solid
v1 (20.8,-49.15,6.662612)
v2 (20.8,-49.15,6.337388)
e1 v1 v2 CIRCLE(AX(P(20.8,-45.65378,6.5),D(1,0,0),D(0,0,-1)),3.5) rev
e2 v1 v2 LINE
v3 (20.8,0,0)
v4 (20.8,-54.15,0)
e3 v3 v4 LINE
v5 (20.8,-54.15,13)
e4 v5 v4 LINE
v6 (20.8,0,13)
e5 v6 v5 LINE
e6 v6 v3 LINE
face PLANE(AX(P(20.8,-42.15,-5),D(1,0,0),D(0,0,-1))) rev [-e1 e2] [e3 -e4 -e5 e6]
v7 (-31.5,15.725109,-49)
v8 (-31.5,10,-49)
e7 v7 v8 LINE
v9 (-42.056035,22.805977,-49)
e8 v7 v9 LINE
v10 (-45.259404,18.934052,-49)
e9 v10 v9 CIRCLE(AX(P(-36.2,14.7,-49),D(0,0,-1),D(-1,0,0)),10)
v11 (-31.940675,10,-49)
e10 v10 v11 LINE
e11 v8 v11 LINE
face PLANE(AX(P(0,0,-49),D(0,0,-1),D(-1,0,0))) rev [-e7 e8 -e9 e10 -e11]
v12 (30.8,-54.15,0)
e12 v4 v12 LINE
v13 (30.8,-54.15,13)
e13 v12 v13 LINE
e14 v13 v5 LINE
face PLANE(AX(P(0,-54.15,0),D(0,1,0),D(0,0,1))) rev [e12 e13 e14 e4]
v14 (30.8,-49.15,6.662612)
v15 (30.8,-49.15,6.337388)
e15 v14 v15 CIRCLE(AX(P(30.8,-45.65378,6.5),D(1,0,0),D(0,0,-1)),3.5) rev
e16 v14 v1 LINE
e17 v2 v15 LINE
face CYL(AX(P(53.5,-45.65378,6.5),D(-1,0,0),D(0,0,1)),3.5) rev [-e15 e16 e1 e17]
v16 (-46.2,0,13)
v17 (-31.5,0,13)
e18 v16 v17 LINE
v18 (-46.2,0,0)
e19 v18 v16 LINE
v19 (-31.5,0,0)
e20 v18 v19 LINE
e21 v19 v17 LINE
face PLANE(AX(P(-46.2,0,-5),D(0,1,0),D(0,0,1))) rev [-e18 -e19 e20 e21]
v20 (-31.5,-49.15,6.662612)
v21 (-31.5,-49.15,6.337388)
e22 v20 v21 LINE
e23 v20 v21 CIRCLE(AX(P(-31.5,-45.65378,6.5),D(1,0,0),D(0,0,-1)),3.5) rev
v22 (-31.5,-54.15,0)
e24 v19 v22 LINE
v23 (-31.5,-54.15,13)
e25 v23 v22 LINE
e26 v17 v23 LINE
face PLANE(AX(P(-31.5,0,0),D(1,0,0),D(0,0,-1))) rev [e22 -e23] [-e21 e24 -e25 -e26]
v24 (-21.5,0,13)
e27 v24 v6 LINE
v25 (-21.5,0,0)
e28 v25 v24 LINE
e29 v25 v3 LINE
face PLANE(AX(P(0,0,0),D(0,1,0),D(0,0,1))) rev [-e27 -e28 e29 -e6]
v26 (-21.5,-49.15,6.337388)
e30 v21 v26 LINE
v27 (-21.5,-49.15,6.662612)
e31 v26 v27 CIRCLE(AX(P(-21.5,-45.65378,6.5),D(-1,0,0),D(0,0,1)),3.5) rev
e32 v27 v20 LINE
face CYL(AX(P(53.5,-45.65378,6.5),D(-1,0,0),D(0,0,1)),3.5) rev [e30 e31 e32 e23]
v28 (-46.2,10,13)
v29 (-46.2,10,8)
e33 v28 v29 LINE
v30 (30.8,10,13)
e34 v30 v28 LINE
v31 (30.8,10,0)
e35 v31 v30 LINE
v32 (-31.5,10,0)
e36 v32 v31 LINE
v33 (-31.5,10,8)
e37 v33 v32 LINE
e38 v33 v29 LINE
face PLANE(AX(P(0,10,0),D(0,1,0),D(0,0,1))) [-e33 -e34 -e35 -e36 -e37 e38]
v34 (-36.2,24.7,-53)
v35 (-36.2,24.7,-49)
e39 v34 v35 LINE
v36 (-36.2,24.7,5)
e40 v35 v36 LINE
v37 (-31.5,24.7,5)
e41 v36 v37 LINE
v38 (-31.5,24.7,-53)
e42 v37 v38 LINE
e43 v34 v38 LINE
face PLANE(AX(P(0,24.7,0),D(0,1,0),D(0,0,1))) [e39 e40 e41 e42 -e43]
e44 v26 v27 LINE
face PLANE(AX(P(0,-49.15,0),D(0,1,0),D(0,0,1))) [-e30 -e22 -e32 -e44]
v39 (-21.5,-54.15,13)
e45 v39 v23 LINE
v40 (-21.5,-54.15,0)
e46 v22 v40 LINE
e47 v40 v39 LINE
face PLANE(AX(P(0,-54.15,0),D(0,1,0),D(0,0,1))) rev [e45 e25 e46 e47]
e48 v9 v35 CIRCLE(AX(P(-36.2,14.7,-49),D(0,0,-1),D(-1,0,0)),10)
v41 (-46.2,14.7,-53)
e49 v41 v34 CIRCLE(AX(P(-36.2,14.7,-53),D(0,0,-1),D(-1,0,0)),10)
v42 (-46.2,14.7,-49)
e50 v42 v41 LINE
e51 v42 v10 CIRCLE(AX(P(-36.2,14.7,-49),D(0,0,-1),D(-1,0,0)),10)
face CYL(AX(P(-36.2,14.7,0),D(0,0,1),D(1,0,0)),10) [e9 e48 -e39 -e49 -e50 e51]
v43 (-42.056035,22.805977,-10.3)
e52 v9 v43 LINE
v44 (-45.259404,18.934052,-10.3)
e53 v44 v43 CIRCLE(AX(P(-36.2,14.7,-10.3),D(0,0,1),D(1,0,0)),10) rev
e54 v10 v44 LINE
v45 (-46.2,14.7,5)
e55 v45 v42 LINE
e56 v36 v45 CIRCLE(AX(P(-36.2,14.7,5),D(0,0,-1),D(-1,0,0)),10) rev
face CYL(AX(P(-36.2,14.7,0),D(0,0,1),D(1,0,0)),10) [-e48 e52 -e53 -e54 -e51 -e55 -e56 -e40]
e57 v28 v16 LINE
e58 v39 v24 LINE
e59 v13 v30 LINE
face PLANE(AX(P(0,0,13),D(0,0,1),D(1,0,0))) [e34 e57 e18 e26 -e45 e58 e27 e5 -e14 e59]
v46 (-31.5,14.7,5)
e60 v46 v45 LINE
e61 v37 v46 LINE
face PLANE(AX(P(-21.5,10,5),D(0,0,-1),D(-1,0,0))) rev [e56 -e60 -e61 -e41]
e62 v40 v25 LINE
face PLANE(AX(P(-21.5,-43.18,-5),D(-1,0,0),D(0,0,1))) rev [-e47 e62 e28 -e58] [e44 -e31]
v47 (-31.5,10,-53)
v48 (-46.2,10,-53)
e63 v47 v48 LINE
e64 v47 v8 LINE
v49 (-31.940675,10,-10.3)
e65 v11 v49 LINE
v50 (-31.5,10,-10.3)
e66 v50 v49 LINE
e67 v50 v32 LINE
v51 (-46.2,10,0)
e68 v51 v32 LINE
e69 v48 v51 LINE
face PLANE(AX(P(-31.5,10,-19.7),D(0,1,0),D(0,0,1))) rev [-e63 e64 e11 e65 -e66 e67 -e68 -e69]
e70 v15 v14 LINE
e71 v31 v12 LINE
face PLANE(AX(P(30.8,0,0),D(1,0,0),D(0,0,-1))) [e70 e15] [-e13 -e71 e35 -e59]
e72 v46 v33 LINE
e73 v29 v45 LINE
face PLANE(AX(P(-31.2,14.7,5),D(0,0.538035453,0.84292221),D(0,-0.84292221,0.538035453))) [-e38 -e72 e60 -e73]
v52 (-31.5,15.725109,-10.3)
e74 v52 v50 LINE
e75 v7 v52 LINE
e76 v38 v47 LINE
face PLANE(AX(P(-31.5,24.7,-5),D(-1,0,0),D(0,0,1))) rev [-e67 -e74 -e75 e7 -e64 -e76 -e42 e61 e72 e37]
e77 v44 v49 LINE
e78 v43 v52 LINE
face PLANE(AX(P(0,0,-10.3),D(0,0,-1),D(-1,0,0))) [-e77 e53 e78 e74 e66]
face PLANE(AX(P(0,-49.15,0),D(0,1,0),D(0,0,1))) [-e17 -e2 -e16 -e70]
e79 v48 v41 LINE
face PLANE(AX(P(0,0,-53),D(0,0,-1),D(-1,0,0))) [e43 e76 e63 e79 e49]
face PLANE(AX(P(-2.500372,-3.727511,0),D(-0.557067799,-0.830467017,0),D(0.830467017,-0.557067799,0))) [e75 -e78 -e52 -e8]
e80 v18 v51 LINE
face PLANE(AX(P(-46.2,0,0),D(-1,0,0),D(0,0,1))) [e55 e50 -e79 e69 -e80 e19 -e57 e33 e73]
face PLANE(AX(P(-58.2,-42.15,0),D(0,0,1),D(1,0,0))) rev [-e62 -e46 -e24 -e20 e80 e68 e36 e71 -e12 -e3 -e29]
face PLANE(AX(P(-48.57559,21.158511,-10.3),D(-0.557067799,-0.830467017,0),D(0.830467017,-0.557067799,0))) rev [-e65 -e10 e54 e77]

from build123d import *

# Parameters (mm, degrees)
SKETCH_1_W                = 43
SKETCH_1_H                = 10
EXTRUDE_1_DEPTH           = 10
SKETCH_2_W                = 10
SKETCH_2_H                = 10
EXTRUDE_2_DEPTH           = 10
SKETCH_3_W                = 10
SKETCH_3_H                = 10
EXTRUDE_3_DEPTH           = 43.18
SKETCH_4_W                = 10
SKETCH_4_H                = 10
EXTRUDE_4_DEPTH           = 10
SKETCH_5_W                = 10
SKETCH_5_H                = 10
EXTRUDE_5_DEPTH           = 43.18
SKETCH_7_W                = 10
SKETCH_7_H                = 10
EXTRUDE_6_DEPTH           = 14.7
SKETCH_8_W                = 14.7
SKETCH_8_H                = 10
EXTRUDE_7_DEPTH           = 14.7
SKETCH_9_W                = 14.7
SKETCH_9_H                = 14.7
EXTRUDE_8_DEPTH           = 14.7
SKETCH_10_W               = 14.7
SKETCH_10_H               = 14.7
EXTRUDE_10_DEPTH          = 14.82
SKETCH_11_W               = 14.7
SKETCH_11_H               = 14.48
EXTRUDE_11_DEPTH          = 14.82
FILLET_2_R                = 10
CUT_EXTRUDE_1_DEPTH       = 38.7
SKETCH_16_W               = 38.7
SKETCH_16_H               = 0.791061332
CUT_EXTRUDE_2_DEPTH       = 98.525917704
SKETCH_17_W               = 14.259325205
SKETCH_17_H               = 0.12
CUT_EXTRUDE_3_DEPTH       = 38.7
SKETCH_18_W               = 14.7
SKETCH_18_H               = 14.7
EXTRUDE_13_DEPTH          = 4
SKETCH_21_W               = 16.037638094
SKETCH_21_H               = 38.7
CUT_EXTRUDE_4_DEPTH       = 5
FILLET_3_R                = 10
SKETCH_24_W               = 10
SKETCH_24_H               = 53.18
CUT_EXTRUDE_6_DEPTH       = 13
SKETCH_25_W               = 10
SKETCH_25_H               = 1.03
CUT_EXTRUDE_7_DEPTH       = 80.391135525
SKETCH_26_W               = 0.7
SKETCH_26_H               = 10
CUT_EXTRUDE_8_DEPTH       = 79.835667689
SKETCH_27_W               = 10
SKETCH_27_H               = 10
EXTRUDE_15_DEPTH          = 10
SKETCH_28_W               = 10
SKETCH_28_H               = 10
EXTRUDE_16_DEPTH          = 42.15
SKETCH_30_W               = 5
SKETCH_30_H               = 52.15
CUT_EXTRUDE_9_DEPTH       = 89
EXTRUDE_18_DEPTH          = 3
SKETCH_33_W               = 38.7
SKETCH_33_H               = 2.269862795
CUT_EXTRUDE_10_DEPTH      = 3
EXTRUDE_19_DEPTH          = 15
SKETCH_35_W               = 0.3
SKETCH_35_H               = 4.7
CUT_EXTRUDE_11_DEPTH      = 86.293976927
SKETCH_36_W               = 10
SKETCH_36_H               = 8
EXTRUDE_20_DEPTH          = 2
SKETCH_38_W               = 10
SKETCH_38_H               = 8
EXTRUDE_21_DEPTH          = 5
EXTRUDE_22_DEPTH          = 5
CUT_EXTRUDE_13_DEPTH      = 75
CUT_EXTRUDE_13_DEPTH_BACK = 90.218902145
SKETCH_45_R               = 3.5
SKETCH_46_W               = 10
SKETCH_46_H               = 13
EXTRUDE_23_DEPTH          = 5


with BuildPart() as part:
    # 草圖1 → 填料-伸長1 (new body)
    with BuildSketch(Plane(origin=(0, 0, 0), x_dir=(1, 0, 0), z_dir=(0, 1, 0))):
        Rectangle(SKETCH_1_W, SKETCH_1_H)
    extrude(amount=EXTRUDE_1_DEPTH)

    # 草圖2 → 填料-伸長2 (add)
    with BuildSketch(Plane(origin=(21.5, 0, 0), x_dir=(0, 0, -1), z_dir=(1, 0, 0))):
        with Locations((0, 5)):
            Rectangle(SKETCH_2_W, SKETCH_2_H)
    extrude(amount=EXTRUDE_2_DEPTH)

    # 草圖3 → 填料-伸長3 (add)
    with BuildSketch(Plane.XZ):
        with Locations((26.5, 0)):
            Rectangle(SKETCH_3_W, SKETCH_3_H)
    extrude(amount=EXTRUDE_3_DEPTH)

    # 草圖4 → 填料-伸長4 (add)
    with BuildSketch(Plane.ZY.offset(21.5)):
        with Locations((0, 5)):
            Rectangle(SKETCH_4_W, SKETCH_4_H)
    extrude(amount=EXTRUDE_4_DEPTH)

    # 草圖5 → 填料-伸長5 (add)
    with BuildSketch(Plane.XZ):
        with Locations((-26.5, 0)):
            Rectangle(SKETCH_5_W, SKETCH_5_H)
    extrude(amount=EXTRUDE_5_DEPTH)

    # 草圖7 → 填料-伸長6 (add)
    with BuildSketch(Plane.ZY.offset(31.5)):
        with Locations((0, 5)):
            Rectangle(SKETCH_7_W, SKETCH_7_H)
    extrude(amount=EXTRUDE_6_DEPTH)

    # 草圖8 → 填料-伸長7 (add)
    with BuildSketch(Plane(origin=(0, 10, 0), x_dir=(1, 0, 0), z_dir=(0, 1, 0))):
        with Locations((-38.85, 0)):
            Rectangle(SKETCH_8_W, SKETCH_8_H)
    extrude(amount=EXTRUDE_7_DEPTH)

    # 草圖9 → 填料-伸長8 (add)
    with BuildSketch(Plane(origin=(0, 0, -5), x_dir=(-1, 0, 0), z_dir=(0, 0, -1))):
        with Locations((38.85, 17.35)):
            Rectangle(SKETCH_9_W, SKETCH_9_H)
    extrude(amount=EXTRUDE_8_DEPTH)

    # 草圖10 → 填料-伸長10 (add)
    with BuildSketch(Plane(origin=(0, 0, -19.7), x_dir=(-1, 0, 0), z_dir=(0, 0, -1))):
        with Locations((38.85, 17.35)):
            Rectangle(SKETCH_10_W, SKETCH_10_H)
    extrude(amount=EXTRUDE_10_DEPTH)

    # 草圖11 → 填料-伸長11 (add)
    with BuildSketch(Plane(origin=(0, 24.7, 0), x_dir=(1, 0, 0), z_dir=(0, 1, 0))):
        with Locations((-38.85, 41.76)):
            Rectangle(SKETCH_11_W, SKETCH_11_H)
    extrude(amount=-EXTRUDE_11_DEPTH)

    # 圓角2
    fillet_2_edges = [part.edges().sort_by_distance(p)[0] for p in [
        (-46.2, 24.7, -22),
    ]]
    fillet(fillet_2_edges, radius=FILLET_2_R)

    # 草圖15 → 除料-伸長1 (cut)
    with BuildSketch(Plane(origin=(0, 0, -49), x_dir=(-1, 0, 0), z_dir=(0, 0, -1))):
        Polygon((31.5, 10.656950345), (32.021169426, 9.88), (31.5, 9.88), align=None)
    extrude(amount=-CUT_EXTRUDE_1_DEPTH, mode=Mode.SUBTRACT)

    # 草圖16 → 除料-伸長2 (cut, through all)
    with BuildSketch(Plane(origin=(-26.654964144, 17.879845802, 0), x_dir=(0, 0, -1), z_dir=(0.8304670174189052, -0.5570677992662544, 0))):
        with Locations((29.65, -9.092920575)):
            Rectangle(SKETCH_16_W, SKETCH_16_H)
    extrude(amount=-CUT_EXTRUDE_2_DEPTH, mode=Mode.SUBTRACT)

    # 草圖17 → 除料-伸長3 (cut)
    with BuildSketch(Plane(origin=(0, 0, -49), x_dir=(-1, 0, 0), z_dir=(0, 0, -1))):
        with Locations((39.070337398, 9.94)):
            Rectangle(SKETCH_17_W, SKETCH_17_H)
    extrude(amount=-CUT_EXTRUDE_3_DEPTH, mode=Mode.SUBTRACT)

    # 草圖18 → 填料-伸長13 (add)
    with BuildSketch(Plane(origin=(0, 0, -49), x_dir=(-1, 0, 0), z_dir=(0, 0, -1))):
        with Locations((38.85, 17.35)):
            Rectangle(SKETCH_18_W, SKETCH_18_H)
    extrude(amount=EXTRUDE_13_DEPTH)

    # 草圖21 → 除料-伸長4 (cut)
    with BuildSketch(Plane(origin=(-5.285710651, -7.879845802, 0), x_dir=(0.830467017418905, -0.5570677992662544, 0), z_dir=(0.5570677992662545, 0.8304670174189052, 0))):
        with Locations((-40.115173971, 29.65)):
            Rectangle(SKETCH_21_W, SKETCH_21_H)
    extrude(amount=CUT_EXTRUDE_4_DEPTH, mode=Mode.SUBTRACT)

    # 圓角3
    fillet_3_edges = [part.edges().sort_by_distance(p)[0] for p in [
        (-46.2, 24.7, -51),
    ]]
    fillet(fillet_3_edges, radius=FILLET_3_R - 0.0001)  # a hair under: the kernel refuses the full size

    # 草圖24 → 除料-伸長6 (cut)
    with BuildSketch(Plane(origin=(0, 0, -5), x_dir=(-1, 0, 0), z_dir=(0, 0, -1))):
        with Locations((-26.5, -16.59)):
            Rectangle(SKETCH_24_W, SKETCH_24_H)
    extrude(amount=-CUT_EXTRUDE_6_DEPTH, mode=Mode.SUBTRACT)

    # 草圖25 → 除料-伸長7 (cut, through all)
    with BuildSketch(Plane(origin=(0, 0, -5), x_dir=(-1, 0, 0), z_dir=(0, 0, -1))):
        with Locations((26.5, -42.665)):
            Rectangle(SKETCH_25_W, SKETCH_25_H)
    extrude(amount=-CUT_EXTRUDE_7_DEPTH, mode=Mode.SUBTRACT)

    # 草圖26 → 除料-伸長8 (cut, through all)
    with BuildSketch(Plane(origin=(0, 0, -5), x_dir=(-1, 0, 0), z_dir=(0, 0, -1))):
        with Locations((-21.15, 5)):
            Rectangle(SKETCH_26_W, SKETCH_26_H)
    extrude(amount=-CUT_EXTRUDE_8_DEPTH, mode=Mode.SUBTRACT)

    # 草圖27 → 填料-伸長15 (add)
    with BuildSketch(Plane(origin=(20.8, 0, 0), x_dir=(0, 0, -1), z_dir=(1, 0, 0))):
        with Locations((0, 5)):
            Rectangle(SKETCH_27_W, SKETCH_27_H)
    extrude(amount=EXTRUDE_15_DEPTH)

    # 草圖28 → 填料-伸長16 (add)
    with BuildSketch(Plane.XZ):
        with Locations((25.8, 0)):
            Rectangle(SKETCH_28_W, SKETCH_28_H)
    extrude(amount=EXTRUDE_16_DEPTH)

    # 草圖30 → 除料-伸長9 (cut)
    with BuildSketch(Plane(origin=(30.8, 0, 0), x_dir=(0, 0, -1), z_dir=(1, 0, 0))):
        with Locations((2.5, -16.075)):
            Rectangle(SKETCH_30_W, SKETCH_30_H)
    extrude(amount=-CUT_EXTRUDE_9_DEPTH, mode=Mode.SUBTRACT)

    # 草圖32 → 填料-伸長18 (add)
    with BuildSketch(Plane.XY.offset(5)):
        Polygon((20.8, -42.15), (30.8, -42.15), (30.8, 10), (-46.2, 10), (-46.2, 0), (-31.5, 0), (-31.5, -42.15), (-21.5, -42.15), (-21.5, 0), (20.8, 0), align=None)
    extrude(amount=EXTRUDE_18_DEPTH)

    # 草圖33 → 除料-伸長10 (cut)
    with BuildSketch(Plane(origin=(-39.973693618, 26.81389756, 0), x_dir=(0, 0, -1), z_dir=(0.830467017418905, -0.5570677992662545, 0))):
        with Locations((29.65, -7.562458512)):
            Rectangle(SKETCH_33_W, SKETCH_33_H)
    extrude(amount=-CUT_EXTRUDE_10_DEPTH, mode=Mode.SUBTRACT)

    # 草圖34 → 填料-伸長19 (add)
    with BuildSketch(Plane.ZY.offset(46.2)):
        Polygon((5, 14.7), (8, 10), (5, 10), align=None)
    extrude(amount=-EXTRUDE_19_DEPTH)

    # 草圖35 → 除料-伸長11 (cut, through all)
    with BuildSketch(Plane(origin=(0, 0, 5), x_dir=(-1, 0, 0), z_dir=(0, 0, -1))):
        with Locations((31.35, 12.35)):
            Rectangle(SKETCH_35_W, SKETCH_35_H)
    extrude(amount=-CUT_EXTRUDE_11_DEPTH, mode=Mode.SUBTRACT)

    # 草圖36 → 填料-伸長20 (add)
    with BuildSketch(Plane.XZ.offset(42.15)):
        with Locations((25.8, 4)):
            Rectangle(SKETCH_36_W, SKETCH_36_H)
        with Locations((-26.5, 4)):
            Rectangle(SKETCH_36_W, SKETCH_36_H)
    extrude(amount=EXTRUDE_20_DEPTH)

    # 草圖38 → 填料-伸長21 (add)
    with BuildSketch(Plane.XZ.offset(44.15)):
        with Locations((25.8, 4)):
            Rectangle(SKETCH_38_W, SKETCH_38_H)
        with Locations((-26.5, 4)):
            Rectangle(SKETCH_38_W, SKETCH_38_H)
    extrude(amount=EXTRUDE_21_DEPTH)

    # 草圖41 → 填料-伸長22 (add)
    with BuildSketch(Plane.XY.offset(8)):
        Polygon((-46.2, 10), (-46.2, 0), (-31.5, 0), (-31.5, -49.15), (-21.5, -49.15), (-21.5, 0), (20.8, 0), (20.8, -49.15), (30.8, -49.15), (30.8, 10), align=None)
    extrude(amount=EXTRUDE_22_DEPTH)

    # 草圖45 → 除料-伸長13 (cut, two sides: drawn at the far end of the back side and taken through both)
    with BuildSketch(Plane(origin=(-21.5, 0, 0), x_dir=(0, 0, -1), z_dir=(1, 0, 0)).offset(-CUT_EXTRUDE_13_DEPTH_BACK)):
        with Locations((-6.5, -45.653779556)):
            Circle(SKETCH_45_R)
    extrude(amount=CUT_EXTRUDE_13_DEPTH + CUT_EXTRUDE_13_DEPTH_BACK, mode=Mode.SUBTRACT)

    # 草圖46 → 填料-伸長23 (add)
    with BuildSketch(Plane.XZ.offset(49.15)):
        with Locations((25.8, 6.5)):
            Rectangle(SKETCH_46_W, SKETCH_46_H)
        with Locations((-26.5, 6.5)):
            Rectangle(SKETCH_46_W, SKETCH_46_H)
    extrude(amount=EXTRUDE_23_DEPTH)


solid = part.part
